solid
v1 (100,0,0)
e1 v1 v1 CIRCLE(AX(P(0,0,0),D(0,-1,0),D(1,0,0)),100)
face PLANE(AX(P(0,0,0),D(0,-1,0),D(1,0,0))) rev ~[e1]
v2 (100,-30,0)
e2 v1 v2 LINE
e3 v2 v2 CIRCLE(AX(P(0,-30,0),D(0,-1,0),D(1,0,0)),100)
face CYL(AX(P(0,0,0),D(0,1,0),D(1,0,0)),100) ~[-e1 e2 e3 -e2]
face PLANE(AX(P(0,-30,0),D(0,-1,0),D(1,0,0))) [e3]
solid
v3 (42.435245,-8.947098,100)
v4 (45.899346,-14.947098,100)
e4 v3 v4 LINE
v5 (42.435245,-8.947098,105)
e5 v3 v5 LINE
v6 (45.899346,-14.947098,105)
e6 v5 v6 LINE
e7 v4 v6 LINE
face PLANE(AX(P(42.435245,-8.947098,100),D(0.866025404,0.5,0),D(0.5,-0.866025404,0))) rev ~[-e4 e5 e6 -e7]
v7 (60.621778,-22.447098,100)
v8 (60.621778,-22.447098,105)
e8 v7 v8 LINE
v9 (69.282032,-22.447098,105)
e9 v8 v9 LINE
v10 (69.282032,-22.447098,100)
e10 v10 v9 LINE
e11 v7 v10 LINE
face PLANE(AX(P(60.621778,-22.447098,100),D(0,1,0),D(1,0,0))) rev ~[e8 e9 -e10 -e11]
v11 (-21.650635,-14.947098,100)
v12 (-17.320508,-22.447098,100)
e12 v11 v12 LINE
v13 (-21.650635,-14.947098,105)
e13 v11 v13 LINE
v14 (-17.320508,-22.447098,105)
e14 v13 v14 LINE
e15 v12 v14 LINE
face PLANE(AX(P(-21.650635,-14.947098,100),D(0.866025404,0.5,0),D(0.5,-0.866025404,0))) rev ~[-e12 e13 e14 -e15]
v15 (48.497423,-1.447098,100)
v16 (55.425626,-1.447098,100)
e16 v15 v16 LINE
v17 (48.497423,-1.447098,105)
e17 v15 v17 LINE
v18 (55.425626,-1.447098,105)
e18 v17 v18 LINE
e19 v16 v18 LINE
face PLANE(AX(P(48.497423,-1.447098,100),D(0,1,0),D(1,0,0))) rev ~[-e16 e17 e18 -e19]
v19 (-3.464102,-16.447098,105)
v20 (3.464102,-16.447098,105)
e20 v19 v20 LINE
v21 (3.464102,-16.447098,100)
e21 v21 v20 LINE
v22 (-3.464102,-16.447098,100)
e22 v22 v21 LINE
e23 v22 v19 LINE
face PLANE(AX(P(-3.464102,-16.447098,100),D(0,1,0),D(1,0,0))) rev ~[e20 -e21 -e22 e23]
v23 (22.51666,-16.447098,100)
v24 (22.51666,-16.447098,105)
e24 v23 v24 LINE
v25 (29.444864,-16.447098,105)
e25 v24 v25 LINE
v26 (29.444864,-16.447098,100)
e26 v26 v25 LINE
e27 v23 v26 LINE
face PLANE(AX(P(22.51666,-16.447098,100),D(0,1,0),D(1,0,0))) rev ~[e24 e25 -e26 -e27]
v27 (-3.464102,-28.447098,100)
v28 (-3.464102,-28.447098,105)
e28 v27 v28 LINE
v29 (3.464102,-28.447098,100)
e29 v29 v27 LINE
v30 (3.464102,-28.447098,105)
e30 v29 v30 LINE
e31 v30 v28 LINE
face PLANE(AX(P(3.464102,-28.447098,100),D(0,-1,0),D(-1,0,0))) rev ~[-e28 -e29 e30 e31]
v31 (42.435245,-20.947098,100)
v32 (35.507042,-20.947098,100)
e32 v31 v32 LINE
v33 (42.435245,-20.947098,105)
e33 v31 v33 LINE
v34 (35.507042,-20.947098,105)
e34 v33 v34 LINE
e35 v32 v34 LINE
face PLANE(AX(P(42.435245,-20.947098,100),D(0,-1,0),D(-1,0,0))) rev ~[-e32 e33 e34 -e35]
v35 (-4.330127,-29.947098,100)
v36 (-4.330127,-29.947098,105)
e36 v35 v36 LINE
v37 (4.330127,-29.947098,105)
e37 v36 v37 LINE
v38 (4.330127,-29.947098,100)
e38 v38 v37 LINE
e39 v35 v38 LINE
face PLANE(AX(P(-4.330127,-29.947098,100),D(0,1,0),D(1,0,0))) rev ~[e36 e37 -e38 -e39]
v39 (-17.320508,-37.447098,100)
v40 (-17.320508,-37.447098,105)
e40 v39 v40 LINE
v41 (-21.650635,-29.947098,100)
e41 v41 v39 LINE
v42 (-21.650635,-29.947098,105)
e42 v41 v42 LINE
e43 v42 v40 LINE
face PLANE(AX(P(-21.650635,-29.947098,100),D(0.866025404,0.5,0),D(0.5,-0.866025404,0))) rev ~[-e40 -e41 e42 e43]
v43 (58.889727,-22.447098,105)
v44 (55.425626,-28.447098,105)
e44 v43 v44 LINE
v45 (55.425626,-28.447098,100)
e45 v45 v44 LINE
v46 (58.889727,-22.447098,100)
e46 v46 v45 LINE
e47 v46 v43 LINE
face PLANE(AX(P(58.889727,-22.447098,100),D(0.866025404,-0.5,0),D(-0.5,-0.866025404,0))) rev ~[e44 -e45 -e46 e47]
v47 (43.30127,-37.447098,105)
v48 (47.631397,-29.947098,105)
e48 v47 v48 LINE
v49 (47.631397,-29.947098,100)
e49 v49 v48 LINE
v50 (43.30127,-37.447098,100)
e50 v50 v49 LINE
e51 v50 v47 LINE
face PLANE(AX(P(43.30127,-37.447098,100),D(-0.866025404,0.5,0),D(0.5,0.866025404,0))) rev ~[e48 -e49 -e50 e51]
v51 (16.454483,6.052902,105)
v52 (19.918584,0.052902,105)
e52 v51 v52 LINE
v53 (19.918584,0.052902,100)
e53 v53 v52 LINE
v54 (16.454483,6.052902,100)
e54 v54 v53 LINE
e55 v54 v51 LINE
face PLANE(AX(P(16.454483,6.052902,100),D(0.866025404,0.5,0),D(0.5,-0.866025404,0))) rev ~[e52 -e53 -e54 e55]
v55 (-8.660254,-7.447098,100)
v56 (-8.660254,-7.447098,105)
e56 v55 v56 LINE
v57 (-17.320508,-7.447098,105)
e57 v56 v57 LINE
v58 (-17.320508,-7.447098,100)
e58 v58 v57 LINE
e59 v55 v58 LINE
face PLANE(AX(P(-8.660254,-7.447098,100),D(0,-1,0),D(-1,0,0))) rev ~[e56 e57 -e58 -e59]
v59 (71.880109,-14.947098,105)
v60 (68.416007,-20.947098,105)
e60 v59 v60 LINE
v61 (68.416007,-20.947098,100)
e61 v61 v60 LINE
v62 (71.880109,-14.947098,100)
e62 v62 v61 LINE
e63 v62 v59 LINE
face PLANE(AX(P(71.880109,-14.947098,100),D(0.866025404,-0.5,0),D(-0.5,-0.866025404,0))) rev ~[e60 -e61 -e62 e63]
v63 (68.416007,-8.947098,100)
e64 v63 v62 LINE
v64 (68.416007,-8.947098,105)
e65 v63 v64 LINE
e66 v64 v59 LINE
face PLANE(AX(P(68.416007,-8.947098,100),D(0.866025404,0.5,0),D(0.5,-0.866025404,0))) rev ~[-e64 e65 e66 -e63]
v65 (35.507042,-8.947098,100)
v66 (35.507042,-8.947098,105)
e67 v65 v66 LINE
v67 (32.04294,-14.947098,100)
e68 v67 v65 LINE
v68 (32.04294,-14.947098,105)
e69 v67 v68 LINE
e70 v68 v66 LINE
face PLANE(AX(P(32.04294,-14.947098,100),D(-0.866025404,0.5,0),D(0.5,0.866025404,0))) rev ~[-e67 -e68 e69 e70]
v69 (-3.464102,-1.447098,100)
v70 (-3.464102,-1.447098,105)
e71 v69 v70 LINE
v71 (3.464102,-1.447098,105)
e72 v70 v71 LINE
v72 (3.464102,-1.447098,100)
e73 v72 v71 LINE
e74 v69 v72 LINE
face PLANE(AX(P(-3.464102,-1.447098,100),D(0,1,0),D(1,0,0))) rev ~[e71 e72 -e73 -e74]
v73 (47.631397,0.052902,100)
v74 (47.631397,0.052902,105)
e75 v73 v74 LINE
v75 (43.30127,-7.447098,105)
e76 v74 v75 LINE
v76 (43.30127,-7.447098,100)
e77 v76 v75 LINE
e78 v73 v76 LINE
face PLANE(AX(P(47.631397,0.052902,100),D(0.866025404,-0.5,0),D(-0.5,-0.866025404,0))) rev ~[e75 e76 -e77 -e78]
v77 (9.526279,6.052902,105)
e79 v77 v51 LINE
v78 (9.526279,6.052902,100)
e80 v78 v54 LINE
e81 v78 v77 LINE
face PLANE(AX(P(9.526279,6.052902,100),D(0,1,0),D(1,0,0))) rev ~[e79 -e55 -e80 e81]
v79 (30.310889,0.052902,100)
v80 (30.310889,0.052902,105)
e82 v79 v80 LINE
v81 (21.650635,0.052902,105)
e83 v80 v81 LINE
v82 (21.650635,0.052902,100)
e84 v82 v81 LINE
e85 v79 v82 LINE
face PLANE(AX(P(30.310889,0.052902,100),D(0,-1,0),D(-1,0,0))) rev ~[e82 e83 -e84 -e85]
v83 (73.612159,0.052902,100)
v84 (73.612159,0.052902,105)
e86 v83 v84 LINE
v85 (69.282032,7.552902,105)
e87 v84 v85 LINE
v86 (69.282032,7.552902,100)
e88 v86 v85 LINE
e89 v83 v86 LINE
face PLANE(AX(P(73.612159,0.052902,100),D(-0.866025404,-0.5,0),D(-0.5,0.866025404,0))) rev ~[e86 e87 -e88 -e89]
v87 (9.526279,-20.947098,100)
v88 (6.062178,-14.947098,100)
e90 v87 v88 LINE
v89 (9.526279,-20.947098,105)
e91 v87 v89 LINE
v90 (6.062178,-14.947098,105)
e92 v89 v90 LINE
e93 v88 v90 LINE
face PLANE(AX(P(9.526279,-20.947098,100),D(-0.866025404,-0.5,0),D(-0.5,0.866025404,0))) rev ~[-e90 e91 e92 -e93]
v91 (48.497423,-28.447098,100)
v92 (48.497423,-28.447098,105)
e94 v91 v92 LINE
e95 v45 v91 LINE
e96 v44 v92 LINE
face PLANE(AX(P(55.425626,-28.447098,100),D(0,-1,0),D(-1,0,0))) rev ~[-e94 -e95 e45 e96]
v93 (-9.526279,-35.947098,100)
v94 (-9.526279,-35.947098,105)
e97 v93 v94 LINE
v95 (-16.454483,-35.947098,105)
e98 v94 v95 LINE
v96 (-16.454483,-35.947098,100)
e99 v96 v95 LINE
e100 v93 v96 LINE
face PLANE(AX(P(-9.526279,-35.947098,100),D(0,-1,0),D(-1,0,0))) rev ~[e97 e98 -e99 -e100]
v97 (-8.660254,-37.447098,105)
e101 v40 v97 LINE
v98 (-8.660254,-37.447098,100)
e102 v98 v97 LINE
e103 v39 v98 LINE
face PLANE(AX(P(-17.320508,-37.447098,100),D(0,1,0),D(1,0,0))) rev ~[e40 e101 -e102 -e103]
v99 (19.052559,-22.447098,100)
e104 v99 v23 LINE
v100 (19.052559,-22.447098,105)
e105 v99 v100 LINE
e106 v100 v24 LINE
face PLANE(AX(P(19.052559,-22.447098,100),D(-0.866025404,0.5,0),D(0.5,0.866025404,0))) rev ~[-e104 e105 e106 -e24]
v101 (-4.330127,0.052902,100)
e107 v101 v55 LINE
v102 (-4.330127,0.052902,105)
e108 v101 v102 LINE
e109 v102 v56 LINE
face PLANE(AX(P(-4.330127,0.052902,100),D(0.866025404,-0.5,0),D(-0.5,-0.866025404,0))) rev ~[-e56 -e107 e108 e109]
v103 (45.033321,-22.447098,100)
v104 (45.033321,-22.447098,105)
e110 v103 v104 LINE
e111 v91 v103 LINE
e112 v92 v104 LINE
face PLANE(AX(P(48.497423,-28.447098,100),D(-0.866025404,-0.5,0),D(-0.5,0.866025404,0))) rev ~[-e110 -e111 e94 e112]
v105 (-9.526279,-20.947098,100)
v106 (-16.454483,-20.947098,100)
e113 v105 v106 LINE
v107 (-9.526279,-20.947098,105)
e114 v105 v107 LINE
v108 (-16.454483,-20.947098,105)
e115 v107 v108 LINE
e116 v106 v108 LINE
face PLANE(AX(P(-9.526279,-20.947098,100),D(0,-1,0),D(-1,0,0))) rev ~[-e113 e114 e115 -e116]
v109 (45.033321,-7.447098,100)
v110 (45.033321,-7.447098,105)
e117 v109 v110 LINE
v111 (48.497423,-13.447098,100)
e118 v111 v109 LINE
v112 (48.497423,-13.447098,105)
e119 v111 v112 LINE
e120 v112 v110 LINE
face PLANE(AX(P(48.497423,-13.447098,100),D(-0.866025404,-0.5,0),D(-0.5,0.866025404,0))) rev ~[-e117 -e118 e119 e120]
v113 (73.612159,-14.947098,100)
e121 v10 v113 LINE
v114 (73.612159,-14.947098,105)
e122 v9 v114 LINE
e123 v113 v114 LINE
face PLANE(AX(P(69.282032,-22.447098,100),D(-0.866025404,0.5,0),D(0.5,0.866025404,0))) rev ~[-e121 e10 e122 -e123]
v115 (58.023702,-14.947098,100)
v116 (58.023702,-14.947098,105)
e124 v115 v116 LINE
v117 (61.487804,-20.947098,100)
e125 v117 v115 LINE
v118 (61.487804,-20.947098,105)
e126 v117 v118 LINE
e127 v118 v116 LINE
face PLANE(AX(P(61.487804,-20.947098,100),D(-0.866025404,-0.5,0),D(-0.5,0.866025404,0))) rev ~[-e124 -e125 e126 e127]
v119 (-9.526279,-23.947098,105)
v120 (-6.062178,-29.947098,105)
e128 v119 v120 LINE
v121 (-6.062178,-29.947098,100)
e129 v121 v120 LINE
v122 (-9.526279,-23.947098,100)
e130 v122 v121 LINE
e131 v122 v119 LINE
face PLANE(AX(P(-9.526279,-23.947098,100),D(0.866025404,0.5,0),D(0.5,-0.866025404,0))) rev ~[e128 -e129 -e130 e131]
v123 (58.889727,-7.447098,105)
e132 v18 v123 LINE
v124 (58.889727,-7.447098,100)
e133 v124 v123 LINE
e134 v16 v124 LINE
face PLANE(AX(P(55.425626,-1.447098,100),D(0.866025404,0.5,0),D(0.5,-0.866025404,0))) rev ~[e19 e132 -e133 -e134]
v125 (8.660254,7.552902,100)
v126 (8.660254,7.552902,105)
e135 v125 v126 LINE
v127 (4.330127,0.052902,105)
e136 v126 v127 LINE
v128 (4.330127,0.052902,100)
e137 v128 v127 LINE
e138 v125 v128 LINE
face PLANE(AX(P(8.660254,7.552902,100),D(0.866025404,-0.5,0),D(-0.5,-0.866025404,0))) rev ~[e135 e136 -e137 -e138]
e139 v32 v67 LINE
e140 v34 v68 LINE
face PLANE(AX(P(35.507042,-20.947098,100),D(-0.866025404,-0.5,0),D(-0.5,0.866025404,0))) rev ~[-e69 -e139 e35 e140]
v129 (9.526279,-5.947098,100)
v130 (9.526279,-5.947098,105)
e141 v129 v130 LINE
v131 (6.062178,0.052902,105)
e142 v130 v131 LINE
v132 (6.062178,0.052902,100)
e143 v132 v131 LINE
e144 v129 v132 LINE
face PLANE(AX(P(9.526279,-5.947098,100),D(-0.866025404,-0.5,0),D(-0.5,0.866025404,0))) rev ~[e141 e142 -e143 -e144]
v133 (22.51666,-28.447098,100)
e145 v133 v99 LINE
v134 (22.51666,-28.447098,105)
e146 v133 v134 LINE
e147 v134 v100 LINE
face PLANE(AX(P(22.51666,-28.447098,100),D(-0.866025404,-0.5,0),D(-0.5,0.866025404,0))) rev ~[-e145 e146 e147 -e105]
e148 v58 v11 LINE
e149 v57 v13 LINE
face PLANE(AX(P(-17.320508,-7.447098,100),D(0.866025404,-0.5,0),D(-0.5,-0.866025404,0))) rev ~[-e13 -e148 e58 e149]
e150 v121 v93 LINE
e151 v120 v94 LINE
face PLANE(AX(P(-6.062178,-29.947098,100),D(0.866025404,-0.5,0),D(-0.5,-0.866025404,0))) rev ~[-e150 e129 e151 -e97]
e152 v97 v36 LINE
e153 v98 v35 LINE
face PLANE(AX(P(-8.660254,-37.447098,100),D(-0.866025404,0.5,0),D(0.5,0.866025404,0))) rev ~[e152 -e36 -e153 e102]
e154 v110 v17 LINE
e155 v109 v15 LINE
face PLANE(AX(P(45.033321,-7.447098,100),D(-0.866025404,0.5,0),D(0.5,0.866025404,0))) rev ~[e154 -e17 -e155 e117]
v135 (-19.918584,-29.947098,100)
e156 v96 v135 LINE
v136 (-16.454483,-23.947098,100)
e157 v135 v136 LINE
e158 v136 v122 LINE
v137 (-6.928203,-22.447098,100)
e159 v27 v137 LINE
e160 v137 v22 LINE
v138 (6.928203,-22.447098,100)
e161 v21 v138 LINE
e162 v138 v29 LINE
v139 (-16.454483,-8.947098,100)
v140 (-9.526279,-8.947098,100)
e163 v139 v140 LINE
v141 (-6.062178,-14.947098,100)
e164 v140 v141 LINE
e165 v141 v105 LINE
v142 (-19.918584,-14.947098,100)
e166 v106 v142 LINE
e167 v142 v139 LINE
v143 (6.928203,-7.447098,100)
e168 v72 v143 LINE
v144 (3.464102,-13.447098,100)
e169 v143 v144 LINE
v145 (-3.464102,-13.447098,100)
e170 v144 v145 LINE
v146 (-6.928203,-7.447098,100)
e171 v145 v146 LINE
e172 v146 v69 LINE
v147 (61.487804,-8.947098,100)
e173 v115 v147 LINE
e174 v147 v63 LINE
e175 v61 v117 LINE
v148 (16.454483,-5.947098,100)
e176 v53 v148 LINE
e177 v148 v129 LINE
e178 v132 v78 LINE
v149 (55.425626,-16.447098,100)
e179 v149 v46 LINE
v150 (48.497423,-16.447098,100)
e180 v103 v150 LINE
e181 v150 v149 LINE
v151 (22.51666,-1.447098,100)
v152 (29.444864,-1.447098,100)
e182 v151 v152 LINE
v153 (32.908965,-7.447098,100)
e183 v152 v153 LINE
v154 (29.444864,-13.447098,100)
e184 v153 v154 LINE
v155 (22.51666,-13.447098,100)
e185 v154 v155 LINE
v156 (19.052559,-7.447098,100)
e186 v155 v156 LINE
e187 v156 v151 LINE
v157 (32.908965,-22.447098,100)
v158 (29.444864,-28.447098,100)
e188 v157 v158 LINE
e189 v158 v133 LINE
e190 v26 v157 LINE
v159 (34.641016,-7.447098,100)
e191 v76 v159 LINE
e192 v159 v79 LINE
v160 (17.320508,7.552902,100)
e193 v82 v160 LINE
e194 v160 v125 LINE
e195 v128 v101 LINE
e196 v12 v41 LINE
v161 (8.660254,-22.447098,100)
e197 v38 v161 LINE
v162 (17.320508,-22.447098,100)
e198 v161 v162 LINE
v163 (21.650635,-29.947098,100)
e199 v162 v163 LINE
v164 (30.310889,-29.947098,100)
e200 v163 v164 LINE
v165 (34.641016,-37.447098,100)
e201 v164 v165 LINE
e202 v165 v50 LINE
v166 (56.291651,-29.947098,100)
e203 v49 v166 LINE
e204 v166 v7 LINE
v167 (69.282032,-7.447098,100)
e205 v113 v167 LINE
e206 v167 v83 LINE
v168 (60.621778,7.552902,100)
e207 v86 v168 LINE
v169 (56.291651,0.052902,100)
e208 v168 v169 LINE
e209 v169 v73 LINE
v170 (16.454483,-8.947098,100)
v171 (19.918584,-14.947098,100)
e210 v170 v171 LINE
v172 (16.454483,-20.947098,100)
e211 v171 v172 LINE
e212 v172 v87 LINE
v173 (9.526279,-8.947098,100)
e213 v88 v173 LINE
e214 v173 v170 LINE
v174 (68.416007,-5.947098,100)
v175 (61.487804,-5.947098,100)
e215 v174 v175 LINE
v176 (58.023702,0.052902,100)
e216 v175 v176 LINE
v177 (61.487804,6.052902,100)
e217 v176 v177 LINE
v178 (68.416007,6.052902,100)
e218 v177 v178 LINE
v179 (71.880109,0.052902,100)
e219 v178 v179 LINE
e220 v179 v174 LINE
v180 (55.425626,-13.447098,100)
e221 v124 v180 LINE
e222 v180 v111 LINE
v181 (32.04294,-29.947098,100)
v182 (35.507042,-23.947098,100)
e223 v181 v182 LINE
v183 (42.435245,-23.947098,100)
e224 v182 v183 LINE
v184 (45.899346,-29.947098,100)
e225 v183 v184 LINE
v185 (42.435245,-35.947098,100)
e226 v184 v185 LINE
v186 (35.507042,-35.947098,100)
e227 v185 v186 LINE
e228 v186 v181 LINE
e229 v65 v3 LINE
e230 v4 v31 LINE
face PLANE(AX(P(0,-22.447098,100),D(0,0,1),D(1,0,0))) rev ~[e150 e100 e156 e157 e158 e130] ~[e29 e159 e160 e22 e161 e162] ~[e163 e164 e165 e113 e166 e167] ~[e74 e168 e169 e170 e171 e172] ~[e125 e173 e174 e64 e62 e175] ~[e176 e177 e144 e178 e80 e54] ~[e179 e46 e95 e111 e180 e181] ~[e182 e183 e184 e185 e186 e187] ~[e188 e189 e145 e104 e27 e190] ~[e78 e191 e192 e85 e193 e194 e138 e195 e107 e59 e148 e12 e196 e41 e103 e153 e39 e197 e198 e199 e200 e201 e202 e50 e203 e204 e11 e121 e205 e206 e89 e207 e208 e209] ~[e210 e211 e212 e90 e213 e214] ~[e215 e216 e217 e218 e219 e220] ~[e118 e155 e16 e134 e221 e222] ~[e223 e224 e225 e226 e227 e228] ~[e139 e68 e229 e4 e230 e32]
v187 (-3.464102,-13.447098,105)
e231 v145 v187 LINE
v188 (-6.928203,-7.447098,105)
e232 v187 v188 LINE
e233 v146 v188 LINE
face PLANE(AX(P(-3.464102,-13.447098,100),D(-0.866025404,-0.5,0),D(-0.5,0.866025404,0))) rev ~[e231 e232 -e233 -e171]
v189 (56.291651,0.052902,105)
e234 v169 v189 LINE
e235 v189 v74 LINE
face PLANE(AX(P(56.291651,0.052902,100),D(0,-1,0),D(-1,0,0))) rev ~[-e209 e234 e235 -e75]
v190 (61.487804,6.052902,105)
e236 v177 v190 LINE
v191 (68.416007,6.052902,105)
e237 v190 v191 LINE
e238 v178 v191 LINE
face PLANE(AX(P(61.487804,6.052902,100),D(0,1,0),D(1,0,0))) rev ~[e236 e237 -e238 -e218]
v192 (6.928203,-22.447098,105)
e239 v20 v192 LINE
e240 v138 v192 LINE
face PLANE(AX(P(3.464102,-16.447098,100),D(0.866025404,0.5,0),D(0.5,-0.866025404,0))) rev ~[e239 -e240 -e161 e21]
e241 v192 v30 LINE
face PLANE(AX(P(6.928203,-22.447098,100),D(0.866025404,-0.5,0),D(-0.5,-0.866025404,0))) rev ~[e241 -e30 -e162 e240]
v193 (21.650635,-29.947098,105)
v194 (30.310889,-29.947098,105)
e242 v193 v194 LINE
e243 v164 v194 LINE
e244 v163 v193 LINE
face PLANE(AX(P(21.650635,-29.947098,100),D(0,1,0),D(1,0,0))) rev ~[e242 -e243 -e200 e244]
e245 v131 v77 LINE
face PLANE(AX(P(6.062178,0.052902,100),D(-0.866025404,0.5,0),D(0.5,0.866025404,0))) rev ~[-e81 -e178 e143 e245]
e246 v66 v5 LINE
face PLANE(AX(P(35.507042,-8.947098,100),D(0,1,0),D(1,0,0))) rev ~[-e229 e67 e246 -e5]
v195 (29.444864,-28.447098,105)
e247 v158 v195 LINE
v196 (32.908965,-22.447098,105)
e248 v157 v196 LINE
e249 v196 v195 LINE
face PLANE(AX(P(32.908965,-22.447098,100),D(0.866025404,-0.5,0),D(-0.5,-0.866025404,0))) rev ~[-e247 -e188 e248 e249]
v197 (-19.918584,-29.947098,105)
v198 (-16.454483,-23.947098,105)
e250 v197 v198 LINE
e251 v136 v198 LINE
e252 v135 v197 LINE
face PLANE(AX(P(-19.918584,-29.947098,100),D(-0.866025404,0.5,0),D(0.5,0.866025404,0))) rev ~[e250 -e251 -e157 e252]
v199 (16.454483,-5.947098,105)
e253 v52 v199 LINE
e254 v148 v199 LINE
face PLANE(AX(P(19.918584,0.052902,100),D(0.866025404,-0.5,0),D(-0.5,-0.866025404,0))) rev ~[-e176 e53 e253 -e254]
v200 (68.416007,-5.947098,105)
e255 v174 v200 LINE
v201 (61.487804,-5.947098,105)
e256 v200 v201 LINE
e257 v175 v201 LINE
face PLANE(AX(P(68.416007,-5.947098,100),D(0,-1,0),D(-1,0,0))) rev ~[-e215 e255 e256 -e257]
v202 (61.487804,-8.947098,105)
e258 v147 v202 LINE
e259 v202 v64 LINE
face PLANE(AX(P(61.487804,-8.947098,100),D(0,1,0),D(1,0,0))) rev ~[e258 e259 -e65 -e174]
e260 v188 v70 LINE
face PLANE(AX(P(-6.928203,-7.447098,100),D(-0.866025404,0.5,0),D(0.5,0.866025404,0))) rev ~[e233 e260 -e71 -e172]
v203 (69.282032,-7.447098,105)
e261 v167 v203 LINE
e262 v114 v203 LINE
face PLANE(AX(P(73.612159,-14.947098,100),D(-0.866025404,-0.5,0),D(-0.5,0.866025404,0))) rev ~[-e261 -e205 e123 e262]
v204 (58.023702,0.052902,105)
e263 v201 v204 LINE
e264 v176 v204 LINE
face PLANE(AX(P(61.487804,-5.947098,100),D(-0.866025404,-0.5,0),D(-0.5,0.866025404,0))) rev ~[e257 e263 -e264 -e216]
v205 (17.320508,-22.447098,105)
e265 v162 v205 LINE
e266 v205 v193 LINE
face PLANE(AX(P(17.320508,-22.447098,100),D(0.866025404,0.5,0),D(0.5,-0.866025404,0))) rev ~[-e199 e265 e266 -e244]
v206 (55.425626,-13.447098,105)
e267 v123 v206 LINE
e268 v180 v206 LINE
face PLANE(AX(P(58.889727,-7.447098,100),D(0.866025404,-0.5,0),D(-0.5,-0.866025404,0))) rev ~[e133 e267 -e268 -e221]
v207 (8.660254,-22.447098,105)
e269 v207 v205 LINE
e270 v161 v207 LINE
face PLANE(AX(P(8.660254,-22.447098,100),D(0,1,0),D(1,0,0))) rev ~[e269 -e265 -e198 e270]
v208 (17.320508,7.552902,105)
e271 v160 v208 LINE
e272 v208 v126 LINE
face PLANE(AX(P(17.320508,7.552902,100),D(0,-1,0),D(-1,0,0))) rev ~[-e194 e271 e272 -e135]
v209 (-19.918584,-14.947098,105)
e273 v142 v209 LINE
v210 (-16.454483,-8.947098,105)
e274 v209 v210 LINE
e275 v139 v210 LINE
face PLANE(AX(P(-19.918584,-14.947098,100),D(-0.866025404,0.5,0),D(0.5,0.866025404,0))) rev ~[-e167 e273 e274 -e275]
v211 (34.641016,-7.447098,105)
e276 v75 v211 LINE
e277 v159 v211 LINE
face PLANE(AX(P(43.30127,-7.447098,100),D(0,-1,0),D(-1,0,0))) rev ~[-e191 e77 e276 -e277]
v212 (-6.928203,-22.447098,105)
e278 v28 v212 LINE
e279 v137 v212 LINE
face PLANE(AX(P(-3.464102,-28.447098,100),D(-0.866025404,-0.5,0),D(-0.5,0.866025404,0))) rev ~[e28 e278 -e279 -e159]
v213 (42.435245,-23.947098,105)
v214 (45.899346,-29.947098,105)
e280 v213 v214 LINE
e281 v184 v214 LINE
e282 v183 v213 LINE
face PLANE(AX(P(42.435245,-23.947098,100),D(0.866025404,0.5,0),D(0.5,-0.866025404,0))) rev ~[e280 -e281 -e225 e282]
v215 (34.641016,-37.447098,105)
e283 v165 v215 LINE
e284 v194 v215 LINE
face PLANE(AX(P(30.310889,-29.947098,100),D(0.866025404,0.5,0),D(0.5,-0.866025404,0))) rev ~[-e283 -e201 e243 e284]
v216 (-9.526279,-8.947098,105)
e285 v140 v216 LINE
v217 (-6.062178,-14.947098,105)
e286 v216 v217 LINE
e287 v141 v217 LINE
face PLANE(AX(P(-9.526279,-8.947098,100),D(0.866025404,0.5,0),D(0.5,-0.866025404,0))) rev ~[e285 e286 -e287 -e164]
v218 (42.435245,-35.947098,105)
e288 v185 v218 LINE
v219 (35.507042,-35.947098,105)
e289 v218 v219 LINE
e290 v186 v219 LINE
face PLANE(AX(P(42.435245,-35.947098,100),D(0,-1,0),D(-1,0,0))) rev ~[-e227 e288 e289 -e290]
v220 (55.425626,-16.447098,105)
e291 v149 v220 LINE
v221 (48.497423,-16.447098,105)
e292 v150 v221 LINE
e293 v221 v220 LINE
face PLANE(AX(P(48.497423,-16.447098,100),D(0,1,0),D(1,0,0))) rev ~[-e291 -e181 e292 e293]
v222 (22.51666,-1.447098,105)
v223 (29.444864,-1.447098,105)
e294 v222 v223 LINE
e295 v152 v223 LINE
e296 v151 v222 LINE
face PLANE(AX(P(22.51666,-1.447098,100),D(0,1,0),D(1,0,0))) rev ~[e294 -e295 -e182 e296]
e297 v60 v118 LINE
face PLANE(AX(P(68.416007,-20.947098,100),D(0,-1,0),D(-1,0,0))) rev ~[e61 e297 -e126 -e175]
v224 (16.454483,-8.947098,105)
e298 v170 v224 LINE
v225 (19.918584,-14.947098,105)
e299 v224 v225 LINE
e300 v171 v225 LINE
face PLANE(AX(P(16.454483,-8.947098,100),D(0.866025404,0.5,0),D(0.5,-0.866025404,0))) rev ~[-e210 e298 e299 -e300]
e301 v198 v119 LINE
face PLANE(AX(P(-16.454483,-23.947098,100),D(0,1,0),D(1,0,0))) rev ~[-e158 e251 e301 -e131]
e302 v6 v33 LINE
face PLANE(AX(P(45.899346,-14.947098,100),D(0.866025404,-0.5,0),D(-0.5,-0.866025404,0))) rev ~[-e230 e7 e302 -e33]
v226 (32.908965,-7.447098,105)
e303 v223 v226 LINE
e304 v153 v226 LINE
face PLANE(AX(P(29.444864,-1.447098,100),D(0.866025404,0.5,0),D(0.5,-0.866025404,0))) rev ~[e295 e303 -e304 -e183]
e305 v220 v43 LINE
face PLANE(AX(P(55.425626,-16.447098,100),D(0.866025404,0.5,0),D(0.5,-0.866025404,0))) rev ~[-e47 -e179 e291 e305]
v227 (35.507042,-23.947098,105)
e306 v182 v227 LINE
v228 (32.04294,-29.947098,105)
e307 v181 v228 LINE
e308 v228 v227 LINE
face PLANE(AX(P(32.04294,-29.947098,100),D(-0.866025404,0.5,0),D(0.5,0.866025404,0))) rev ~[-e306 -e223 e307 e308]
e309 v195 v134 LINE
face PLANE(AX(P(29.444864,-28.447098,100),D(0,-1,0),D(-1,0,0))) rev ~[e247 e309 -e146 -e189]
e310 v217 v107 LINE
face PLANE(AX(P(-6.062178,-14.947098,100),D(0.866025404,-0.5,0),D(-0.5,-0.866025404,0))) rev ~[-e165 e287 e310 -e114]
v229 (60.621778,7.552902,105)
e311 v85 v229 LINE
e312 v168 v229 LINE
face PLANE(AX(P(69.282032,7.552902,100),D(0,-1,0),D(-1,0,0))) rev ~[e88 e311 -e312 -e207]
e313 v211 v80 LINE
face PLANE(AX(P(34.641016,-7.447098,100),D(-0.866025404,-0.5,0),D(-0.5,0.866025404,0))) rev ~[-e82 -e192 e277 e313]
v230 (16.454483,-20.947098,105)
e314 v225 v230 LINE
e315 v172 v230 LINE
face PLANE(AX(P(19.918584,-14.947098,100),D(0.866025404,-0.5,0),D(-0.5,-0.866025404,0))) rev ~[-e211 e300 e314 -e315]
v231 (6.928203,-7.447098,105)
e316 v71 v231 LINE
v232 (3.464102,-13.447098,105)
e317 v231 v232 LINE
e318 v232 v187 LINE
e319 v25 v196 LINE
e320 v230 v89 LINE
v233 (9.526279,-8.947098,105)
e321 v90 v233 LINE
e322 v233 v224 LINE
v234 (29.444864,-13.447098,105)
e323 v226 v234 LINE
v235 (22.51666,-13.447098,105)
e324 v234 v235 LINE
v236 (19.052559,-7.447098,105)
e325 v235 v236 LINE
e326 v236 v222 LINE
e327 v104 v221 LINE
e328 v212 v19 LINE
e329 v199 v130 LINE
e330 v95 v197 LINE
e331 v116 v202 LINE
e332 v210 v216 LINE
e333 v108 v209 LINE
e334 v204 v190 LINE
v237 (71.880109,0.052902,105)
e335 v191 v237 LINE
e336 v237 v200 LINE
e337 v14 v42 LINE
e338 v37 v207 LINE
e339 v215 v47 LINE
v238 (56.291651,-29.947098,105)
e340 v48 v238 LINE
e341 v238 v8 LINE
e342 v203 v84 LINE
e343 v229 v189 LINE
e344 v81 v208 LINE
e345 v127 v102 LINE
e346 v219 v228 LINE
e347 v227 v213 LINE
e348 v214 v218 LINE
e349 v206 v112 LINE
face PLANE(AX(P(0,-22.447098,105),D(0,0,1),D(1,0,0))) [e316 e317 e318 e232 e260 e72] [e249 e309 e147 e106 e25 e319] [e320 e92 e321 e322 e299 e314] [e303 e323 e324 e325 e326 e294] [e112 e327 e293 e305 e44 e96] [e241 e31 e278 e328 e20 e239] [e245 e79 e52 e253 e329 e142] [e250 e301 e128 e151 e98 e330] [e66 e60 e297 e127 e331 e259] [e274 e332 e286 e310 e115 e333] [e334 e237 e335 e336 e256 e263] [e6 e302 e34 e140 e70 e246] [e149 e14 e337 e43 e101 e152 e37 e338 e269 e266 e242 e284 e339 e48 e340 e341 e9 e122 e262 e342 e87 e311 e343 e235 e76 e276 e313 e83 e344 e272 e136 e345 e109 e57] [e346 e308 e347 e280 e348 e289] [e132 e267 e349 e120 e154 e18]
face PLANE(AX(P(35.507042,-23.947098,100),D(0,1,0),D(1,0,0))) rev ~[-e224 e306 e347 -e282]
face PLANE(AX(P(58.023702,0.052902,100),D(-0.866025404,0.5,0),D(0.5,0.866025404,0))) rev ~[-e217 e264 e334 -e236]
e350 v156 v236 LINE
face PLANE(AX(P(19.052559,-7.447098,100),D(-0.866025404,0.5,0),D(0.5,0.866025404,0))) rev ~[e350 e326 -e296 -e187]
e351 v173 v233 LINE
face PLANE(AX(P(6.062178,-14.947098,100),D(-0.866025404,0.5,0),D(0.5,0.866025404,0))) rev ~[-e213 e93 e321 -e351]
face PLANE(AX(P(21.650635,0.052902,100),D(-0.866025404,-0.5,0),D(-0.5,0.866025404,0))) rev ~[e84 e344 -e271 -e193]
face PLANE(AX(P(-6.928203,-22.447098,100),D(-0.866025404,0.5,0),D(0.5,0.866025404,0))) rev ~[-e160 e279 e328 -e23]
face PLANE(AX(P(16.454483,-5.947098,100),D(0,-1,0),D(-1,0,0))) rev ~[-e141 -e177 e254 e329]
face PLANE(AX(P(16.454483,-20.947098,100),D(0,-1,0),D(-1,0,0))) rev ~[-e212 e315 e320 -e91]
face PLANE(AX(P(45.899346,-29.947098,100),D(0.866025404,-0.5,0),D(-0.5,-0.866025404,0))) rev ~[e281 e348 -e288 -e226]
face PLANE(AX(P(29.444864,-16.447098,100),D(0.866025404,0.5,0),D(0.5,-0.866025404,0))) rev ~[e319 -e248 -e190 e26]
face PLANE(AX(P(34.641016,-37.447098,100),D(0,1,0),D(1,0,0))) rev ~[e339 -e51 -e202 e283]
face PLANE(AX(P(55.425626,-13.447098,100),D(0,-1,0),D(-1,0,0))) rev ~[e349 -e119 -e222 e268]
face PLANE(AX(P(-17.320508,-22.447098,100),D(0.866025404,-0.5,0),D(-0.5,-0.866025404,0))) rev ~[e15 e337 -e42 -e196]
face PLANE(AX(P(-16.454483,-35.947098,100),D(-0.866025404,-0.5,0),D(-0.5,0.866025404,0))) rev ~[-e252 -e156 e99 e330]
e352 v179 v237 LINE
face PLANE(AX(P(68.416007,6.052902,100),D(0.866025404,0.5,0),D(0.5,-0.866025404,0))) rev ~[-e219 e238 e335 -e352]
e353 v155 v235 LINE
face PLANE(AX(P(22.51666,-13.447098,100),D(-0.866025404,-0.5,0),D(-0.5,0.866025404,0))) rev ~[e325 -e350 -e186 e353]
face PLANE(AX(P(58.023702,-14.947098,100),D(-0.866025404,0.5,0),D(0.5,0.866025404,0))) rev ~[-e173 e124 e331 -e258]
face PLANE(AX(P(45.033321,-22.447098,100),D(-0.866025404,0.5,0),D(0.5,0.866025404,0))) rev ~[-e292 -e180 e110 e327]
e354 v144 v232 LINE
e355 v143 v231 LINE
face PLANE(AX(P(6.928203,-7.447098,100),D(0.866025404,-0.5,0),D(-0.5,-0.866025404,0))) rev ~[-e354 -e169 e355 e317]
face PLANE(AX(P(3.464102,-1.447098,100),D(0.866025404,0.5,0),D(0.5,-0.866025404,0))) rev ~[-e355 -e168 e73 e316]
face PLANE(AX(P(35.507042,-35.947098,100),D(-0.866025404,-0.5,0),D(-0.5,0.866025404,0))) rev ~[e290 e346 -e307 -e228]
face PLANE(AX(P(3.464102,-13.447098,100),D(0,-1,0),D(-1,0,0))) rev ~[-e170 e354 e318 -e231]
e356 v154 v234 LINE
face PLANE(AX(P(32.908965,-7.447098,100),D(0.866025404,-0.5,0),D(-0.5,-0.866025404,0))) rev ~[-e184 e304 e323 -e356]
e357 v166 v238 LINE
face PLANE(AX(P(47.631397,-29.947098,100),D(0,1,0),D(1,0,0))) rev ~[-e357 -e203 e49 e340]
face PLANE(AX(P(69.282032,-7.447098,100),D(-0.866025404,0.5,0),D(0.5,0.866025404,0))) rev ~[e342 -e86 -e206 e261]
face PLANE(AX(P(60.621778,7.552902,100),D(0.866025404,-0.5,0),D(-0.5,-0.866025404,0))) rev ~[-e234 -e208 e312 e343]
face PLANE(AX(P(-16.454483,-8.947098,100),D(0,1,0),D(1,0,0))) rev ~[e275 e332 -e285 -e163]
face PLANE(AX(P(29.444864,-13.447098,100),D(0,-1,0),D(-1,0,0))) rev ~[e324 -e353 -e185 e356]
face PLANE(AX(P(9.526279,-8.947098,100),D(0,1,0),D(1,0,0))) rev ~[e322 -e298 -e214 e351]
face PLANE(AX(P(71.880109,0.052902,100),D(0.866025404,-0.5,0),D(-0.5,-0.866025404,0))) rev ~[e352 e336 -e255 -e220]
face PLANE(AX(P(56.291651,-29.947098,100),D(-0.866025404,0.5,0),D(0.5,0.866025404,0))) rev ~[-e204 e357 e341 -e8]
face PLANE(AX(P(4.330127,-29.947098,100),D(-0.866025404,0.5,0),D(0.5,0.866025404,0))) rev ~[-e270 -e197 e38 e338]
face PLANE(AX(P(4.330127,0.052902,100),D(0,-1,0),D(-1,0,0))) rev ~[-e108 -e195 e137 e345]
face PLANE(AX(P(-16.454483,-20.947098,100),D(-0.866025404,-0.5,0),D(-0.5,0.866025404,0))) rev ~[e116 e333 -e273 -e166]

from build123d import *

# Parameters (mm, degrees)
F0_R     = 100
F1_DEPTH = 30
F4_DEPTH = 5


with BuildPart() as f1:
    # F0 (on Front) → F1 (new body)
    with BuildSketch(Plane.XZ):
        Circle(F0_R)
    extrude(amount=F1_DEPTH)


with BuildPart() as f4:
    # F3 (on offset) → F4 (new body)
    with BuildSketch(Plane.XY.offset(100)):
        Polygon((8.6602540378, -22.447098383), (4.3301270189, -14.947098383), (-4.3301270189, -14.947098383), (-8.6602540378, -22.447098383), (-4.3301270189, -29.947098383), (4.3301270189, -29.947098383), align=None)
        Polygon((6.9282032303, -22.447098383), (3.4641016151, -28.447098383), (-3.4641016151, -28.447098383), (-6.9282032303, -22.447098383), (-3.4641016151, -16.447098383), (3.4641016151, -16.447098383), align=None, mode=Mode.SUBTRACT)
        Polygon((-4.3301270189, -14.947098383), (4.3301270189, -14.947098383), (8.6602540378, -7.447098383), (4.3301270189, 0.052901617), (-4.3301270189, 0.052901617), (-8.6602540378, -7.447098383), align=None)
        Polygon((6.9282032303, -7.447098383), (3.4641016151, -13.447098383), (-3.4641016151, -13.447098383), (-6.9282032303, -7.447098383), (-3.4641016151, -1.447098383), (3.4641016151, -1.447098383), align=None, mode=Mode.SUBTRACT)
        Polygon((8.6602540378, -7.447098383), (4.3301270189, -14.947098383), (8.6602540378, -22.447098383), (17.3205080757, -22.447098383), (21.6506350946, -14.947098383), (17.3205080757, -7.447098383), align=None)
        Polygon((19.918584287, -14.947098383), (16.4544826719, -20.947098383), (9.5262794416, -20.947098383), (6.0621778265, -14.947098383), (9.5262794416, -8.947098383), (16.4544826719, -8.947098383), align=None, mode=Mode.SUBTRACT)
        Polygon((-8.6602540378, -22.447098383), (-4.3301270189, -14.947098383), (-8.6602540378, -7.447098383), (-17.3205080757, -7.447098383), (-21.6506350946, -14.947098383), (-17.3205080757, -22.447098383), align=None)
        Polygon((-6.0621778265, -14.947098383), (-9.5262794416, -20.947098383), (-16.4544826719, -20.947098383), (-19.918584287, -14.947098383), (-16.4544826719, -8.947098383), (-9.5262794416, -8.947098383), align=None, mode=Mode.SUBTRACT)
        Polygon((4.3301270189, 0.052901617), (8.6602540378, -7.447098383), (17.3205080757, -7.447098383), (21.6506350946, 0.052901617), (17.3205080757, 7.552901617), (8.6602540378, 7.552901617), align=None)
        Polygon((19.918584287, 0.052901617), (16.4544826719, -5.947098383), (9.5262794416, -5.947098383), (6.0621778265, 0.052901617), (9.5262794416, 6.052901617), (16.4544826719, 6.052901617), align=None, mode=Mode.SUBTRACT)
        Polygon((-4.3301270189, -29.947098383), (-8.6602540378, -22.447098383), (-17.3205080757, -22.447098383), (-21.6506350946, -29.947098383), (-17.3205080757, -37.447098383), (-8.6602540378, -37.447098383), align=None)
        Polygon((-6.0621778265, -29.947098383), (-9.5262794416, -35.947098383), (-16.4544826719, -35.947098383), (-19.918584287, -29.947098383), (-16.4544826719, -23.947098383), (-9.5262794416, -23.947098383), align=None, mode=Mode.SUBTRACT)
        Polygon((21.6506350946, 0.052901617), (17.3205080757, -7.447098383), (21.6506350946, -14.947098383), (30.3108891325, -14.947098383), (34.6410161514, -7.447098383), (30.3108891325, 0.052901617), align=None)
        Polygon((32.9089653438, -7.447098383), (29.4448637287, -13.447098383), (22.5166604984, -13.447098383), (19.0525588833, -7.447098383), (22.5166604984, -1.447098383), (29.4448637287, -1.447098383), align=None, mode=Mode.SUBTRACT)
        Polygon((21.6506350946, -14.947098383), (17.3205080757, -22.447098383), (21.6506350946, -29.947098383), (30.3108891325, -29.947098383), (34.6410161514, -22.447098383), (30.3108891325, -14.947098383), align=None)
        Polygon((32.9089653438, -22.447098383), (29.4448637287, -28.447098383), (22.5166604984, -28.447098383), (19.0525588833, -22.447098383), (22.5166604984, -16.447098383), (29.4448637287, -16.447098383), align=None, mode=Mode.SUBTRACT)
        Polygon((34.6410161514, -7.447098383), (30.3108891325, -14.947098383), (34.6410161514, -22.447098383), (43.3012701892, -22.447098383), (47.6313972081, -14.947098383), (43.3012701892, -7.447098383), align=None)
        Polygon((45.8993464006, -14.947098383), (42.4352447854, -20.947098383), (35.5070415552, -20.947098383), (32.04293994, -14.947098383), (35.5070415552, -8.947098383), (42.4352447854, -8.947098383), align=None, mode=Mode.SUBTRACT)
        Polygon((34.6410161514, -22.447098383), (30.3108891325, -29.947098383), (34.6410161514, -37.447098383), (43.3012701892, -37.447098383), (47.6313972081, -29.947098383), (43.3012701892, -22.447098383), align=None)
        Polygon((45.8993464006, -29.947098383), (42.4352447854, -35.947098383), (35.5070415552, -35.947098383), (32.04293994, -29.947098383), (35.5070415552, -23.947098383), (42.4352447854, -23.947098383), align=None, mode=Mode.SUBTRACT)
        Polygon((47.6313972081, 0.052901617), (43.3012701892, -7.447098383), (47.6313972081, -14.947098383), (56.291651246, -14.947098383), (60.6217782649, -7.447098383), (56.291651246, 0.052901617), align=None)
        Polygon((58.8897274573, -7.447098383), (55.4256258422, -13.447098383), (48.4974226119, -13.447098383), (45.0333209968, -7.447098383), (48.4974226119, -1.447098383), (55.4256258422, -1.447098383), align=None, mode=Mode.SUBTRACT)
        Polygon((47.6313972081, -14.947098383), (43.3012701892, -22.447098383), (47.6313972081, -29.947098383), (56.291651246, -29.947098383), (60.6217782649, -22.447098383), (56.291651246, -14.947098383), align=None)
        Polygon((58.8897274573, -22.447098383), (55.4256258422, -28.447098383), (48.4974226119, -28.447098383), (45.0333209968, -22.447098383), (48.4974226119, -16.447098383), (55.4256258422, -16.447098383), align=None, mode=Mode.SUBTRACT)
        Polygon((60.6217782649, -7.447098383), (56.291651246, -14.947098383), (60.6217782649, -22.447098383), (69.2820323028, -22.447098383), (73.6121593217, -14.947098383), (69.2820323028, -7.447098383), align=None)
        Polygon((71.8801085141, -14.947098383), (68.416006899, -20.947098383), (61.4878036687, -20.947098383), (58.0237020536, -14.947098383), (61.4878036687, -8.947098383), (68.416006899, -8.947098383), align=None, mode=Mode.SUBTRACT)
        Polygon((60.6217782649, 7.552901617), (56.291651246, 0.052901617), (60.6217782649, -7.447098383), (69.2820323028, -7.447098383), (73.6121593217, 0.052901617), (69.2820323028, 7.552901617), align=None)
        Polygon((71.8801085141, 0.052901617), (68.416006899, -5.947098383), (61.4878036687, -5.947098383), (58.0237020536, 0.052901617), (61.4878036687, 6.052901617), (68.416006899, 6.052901617), align=None, mode=Mode.SUBTRACT)
    extrude(amount=F4_DEPTH)


solid = Compound([f1.part, f4.part])
